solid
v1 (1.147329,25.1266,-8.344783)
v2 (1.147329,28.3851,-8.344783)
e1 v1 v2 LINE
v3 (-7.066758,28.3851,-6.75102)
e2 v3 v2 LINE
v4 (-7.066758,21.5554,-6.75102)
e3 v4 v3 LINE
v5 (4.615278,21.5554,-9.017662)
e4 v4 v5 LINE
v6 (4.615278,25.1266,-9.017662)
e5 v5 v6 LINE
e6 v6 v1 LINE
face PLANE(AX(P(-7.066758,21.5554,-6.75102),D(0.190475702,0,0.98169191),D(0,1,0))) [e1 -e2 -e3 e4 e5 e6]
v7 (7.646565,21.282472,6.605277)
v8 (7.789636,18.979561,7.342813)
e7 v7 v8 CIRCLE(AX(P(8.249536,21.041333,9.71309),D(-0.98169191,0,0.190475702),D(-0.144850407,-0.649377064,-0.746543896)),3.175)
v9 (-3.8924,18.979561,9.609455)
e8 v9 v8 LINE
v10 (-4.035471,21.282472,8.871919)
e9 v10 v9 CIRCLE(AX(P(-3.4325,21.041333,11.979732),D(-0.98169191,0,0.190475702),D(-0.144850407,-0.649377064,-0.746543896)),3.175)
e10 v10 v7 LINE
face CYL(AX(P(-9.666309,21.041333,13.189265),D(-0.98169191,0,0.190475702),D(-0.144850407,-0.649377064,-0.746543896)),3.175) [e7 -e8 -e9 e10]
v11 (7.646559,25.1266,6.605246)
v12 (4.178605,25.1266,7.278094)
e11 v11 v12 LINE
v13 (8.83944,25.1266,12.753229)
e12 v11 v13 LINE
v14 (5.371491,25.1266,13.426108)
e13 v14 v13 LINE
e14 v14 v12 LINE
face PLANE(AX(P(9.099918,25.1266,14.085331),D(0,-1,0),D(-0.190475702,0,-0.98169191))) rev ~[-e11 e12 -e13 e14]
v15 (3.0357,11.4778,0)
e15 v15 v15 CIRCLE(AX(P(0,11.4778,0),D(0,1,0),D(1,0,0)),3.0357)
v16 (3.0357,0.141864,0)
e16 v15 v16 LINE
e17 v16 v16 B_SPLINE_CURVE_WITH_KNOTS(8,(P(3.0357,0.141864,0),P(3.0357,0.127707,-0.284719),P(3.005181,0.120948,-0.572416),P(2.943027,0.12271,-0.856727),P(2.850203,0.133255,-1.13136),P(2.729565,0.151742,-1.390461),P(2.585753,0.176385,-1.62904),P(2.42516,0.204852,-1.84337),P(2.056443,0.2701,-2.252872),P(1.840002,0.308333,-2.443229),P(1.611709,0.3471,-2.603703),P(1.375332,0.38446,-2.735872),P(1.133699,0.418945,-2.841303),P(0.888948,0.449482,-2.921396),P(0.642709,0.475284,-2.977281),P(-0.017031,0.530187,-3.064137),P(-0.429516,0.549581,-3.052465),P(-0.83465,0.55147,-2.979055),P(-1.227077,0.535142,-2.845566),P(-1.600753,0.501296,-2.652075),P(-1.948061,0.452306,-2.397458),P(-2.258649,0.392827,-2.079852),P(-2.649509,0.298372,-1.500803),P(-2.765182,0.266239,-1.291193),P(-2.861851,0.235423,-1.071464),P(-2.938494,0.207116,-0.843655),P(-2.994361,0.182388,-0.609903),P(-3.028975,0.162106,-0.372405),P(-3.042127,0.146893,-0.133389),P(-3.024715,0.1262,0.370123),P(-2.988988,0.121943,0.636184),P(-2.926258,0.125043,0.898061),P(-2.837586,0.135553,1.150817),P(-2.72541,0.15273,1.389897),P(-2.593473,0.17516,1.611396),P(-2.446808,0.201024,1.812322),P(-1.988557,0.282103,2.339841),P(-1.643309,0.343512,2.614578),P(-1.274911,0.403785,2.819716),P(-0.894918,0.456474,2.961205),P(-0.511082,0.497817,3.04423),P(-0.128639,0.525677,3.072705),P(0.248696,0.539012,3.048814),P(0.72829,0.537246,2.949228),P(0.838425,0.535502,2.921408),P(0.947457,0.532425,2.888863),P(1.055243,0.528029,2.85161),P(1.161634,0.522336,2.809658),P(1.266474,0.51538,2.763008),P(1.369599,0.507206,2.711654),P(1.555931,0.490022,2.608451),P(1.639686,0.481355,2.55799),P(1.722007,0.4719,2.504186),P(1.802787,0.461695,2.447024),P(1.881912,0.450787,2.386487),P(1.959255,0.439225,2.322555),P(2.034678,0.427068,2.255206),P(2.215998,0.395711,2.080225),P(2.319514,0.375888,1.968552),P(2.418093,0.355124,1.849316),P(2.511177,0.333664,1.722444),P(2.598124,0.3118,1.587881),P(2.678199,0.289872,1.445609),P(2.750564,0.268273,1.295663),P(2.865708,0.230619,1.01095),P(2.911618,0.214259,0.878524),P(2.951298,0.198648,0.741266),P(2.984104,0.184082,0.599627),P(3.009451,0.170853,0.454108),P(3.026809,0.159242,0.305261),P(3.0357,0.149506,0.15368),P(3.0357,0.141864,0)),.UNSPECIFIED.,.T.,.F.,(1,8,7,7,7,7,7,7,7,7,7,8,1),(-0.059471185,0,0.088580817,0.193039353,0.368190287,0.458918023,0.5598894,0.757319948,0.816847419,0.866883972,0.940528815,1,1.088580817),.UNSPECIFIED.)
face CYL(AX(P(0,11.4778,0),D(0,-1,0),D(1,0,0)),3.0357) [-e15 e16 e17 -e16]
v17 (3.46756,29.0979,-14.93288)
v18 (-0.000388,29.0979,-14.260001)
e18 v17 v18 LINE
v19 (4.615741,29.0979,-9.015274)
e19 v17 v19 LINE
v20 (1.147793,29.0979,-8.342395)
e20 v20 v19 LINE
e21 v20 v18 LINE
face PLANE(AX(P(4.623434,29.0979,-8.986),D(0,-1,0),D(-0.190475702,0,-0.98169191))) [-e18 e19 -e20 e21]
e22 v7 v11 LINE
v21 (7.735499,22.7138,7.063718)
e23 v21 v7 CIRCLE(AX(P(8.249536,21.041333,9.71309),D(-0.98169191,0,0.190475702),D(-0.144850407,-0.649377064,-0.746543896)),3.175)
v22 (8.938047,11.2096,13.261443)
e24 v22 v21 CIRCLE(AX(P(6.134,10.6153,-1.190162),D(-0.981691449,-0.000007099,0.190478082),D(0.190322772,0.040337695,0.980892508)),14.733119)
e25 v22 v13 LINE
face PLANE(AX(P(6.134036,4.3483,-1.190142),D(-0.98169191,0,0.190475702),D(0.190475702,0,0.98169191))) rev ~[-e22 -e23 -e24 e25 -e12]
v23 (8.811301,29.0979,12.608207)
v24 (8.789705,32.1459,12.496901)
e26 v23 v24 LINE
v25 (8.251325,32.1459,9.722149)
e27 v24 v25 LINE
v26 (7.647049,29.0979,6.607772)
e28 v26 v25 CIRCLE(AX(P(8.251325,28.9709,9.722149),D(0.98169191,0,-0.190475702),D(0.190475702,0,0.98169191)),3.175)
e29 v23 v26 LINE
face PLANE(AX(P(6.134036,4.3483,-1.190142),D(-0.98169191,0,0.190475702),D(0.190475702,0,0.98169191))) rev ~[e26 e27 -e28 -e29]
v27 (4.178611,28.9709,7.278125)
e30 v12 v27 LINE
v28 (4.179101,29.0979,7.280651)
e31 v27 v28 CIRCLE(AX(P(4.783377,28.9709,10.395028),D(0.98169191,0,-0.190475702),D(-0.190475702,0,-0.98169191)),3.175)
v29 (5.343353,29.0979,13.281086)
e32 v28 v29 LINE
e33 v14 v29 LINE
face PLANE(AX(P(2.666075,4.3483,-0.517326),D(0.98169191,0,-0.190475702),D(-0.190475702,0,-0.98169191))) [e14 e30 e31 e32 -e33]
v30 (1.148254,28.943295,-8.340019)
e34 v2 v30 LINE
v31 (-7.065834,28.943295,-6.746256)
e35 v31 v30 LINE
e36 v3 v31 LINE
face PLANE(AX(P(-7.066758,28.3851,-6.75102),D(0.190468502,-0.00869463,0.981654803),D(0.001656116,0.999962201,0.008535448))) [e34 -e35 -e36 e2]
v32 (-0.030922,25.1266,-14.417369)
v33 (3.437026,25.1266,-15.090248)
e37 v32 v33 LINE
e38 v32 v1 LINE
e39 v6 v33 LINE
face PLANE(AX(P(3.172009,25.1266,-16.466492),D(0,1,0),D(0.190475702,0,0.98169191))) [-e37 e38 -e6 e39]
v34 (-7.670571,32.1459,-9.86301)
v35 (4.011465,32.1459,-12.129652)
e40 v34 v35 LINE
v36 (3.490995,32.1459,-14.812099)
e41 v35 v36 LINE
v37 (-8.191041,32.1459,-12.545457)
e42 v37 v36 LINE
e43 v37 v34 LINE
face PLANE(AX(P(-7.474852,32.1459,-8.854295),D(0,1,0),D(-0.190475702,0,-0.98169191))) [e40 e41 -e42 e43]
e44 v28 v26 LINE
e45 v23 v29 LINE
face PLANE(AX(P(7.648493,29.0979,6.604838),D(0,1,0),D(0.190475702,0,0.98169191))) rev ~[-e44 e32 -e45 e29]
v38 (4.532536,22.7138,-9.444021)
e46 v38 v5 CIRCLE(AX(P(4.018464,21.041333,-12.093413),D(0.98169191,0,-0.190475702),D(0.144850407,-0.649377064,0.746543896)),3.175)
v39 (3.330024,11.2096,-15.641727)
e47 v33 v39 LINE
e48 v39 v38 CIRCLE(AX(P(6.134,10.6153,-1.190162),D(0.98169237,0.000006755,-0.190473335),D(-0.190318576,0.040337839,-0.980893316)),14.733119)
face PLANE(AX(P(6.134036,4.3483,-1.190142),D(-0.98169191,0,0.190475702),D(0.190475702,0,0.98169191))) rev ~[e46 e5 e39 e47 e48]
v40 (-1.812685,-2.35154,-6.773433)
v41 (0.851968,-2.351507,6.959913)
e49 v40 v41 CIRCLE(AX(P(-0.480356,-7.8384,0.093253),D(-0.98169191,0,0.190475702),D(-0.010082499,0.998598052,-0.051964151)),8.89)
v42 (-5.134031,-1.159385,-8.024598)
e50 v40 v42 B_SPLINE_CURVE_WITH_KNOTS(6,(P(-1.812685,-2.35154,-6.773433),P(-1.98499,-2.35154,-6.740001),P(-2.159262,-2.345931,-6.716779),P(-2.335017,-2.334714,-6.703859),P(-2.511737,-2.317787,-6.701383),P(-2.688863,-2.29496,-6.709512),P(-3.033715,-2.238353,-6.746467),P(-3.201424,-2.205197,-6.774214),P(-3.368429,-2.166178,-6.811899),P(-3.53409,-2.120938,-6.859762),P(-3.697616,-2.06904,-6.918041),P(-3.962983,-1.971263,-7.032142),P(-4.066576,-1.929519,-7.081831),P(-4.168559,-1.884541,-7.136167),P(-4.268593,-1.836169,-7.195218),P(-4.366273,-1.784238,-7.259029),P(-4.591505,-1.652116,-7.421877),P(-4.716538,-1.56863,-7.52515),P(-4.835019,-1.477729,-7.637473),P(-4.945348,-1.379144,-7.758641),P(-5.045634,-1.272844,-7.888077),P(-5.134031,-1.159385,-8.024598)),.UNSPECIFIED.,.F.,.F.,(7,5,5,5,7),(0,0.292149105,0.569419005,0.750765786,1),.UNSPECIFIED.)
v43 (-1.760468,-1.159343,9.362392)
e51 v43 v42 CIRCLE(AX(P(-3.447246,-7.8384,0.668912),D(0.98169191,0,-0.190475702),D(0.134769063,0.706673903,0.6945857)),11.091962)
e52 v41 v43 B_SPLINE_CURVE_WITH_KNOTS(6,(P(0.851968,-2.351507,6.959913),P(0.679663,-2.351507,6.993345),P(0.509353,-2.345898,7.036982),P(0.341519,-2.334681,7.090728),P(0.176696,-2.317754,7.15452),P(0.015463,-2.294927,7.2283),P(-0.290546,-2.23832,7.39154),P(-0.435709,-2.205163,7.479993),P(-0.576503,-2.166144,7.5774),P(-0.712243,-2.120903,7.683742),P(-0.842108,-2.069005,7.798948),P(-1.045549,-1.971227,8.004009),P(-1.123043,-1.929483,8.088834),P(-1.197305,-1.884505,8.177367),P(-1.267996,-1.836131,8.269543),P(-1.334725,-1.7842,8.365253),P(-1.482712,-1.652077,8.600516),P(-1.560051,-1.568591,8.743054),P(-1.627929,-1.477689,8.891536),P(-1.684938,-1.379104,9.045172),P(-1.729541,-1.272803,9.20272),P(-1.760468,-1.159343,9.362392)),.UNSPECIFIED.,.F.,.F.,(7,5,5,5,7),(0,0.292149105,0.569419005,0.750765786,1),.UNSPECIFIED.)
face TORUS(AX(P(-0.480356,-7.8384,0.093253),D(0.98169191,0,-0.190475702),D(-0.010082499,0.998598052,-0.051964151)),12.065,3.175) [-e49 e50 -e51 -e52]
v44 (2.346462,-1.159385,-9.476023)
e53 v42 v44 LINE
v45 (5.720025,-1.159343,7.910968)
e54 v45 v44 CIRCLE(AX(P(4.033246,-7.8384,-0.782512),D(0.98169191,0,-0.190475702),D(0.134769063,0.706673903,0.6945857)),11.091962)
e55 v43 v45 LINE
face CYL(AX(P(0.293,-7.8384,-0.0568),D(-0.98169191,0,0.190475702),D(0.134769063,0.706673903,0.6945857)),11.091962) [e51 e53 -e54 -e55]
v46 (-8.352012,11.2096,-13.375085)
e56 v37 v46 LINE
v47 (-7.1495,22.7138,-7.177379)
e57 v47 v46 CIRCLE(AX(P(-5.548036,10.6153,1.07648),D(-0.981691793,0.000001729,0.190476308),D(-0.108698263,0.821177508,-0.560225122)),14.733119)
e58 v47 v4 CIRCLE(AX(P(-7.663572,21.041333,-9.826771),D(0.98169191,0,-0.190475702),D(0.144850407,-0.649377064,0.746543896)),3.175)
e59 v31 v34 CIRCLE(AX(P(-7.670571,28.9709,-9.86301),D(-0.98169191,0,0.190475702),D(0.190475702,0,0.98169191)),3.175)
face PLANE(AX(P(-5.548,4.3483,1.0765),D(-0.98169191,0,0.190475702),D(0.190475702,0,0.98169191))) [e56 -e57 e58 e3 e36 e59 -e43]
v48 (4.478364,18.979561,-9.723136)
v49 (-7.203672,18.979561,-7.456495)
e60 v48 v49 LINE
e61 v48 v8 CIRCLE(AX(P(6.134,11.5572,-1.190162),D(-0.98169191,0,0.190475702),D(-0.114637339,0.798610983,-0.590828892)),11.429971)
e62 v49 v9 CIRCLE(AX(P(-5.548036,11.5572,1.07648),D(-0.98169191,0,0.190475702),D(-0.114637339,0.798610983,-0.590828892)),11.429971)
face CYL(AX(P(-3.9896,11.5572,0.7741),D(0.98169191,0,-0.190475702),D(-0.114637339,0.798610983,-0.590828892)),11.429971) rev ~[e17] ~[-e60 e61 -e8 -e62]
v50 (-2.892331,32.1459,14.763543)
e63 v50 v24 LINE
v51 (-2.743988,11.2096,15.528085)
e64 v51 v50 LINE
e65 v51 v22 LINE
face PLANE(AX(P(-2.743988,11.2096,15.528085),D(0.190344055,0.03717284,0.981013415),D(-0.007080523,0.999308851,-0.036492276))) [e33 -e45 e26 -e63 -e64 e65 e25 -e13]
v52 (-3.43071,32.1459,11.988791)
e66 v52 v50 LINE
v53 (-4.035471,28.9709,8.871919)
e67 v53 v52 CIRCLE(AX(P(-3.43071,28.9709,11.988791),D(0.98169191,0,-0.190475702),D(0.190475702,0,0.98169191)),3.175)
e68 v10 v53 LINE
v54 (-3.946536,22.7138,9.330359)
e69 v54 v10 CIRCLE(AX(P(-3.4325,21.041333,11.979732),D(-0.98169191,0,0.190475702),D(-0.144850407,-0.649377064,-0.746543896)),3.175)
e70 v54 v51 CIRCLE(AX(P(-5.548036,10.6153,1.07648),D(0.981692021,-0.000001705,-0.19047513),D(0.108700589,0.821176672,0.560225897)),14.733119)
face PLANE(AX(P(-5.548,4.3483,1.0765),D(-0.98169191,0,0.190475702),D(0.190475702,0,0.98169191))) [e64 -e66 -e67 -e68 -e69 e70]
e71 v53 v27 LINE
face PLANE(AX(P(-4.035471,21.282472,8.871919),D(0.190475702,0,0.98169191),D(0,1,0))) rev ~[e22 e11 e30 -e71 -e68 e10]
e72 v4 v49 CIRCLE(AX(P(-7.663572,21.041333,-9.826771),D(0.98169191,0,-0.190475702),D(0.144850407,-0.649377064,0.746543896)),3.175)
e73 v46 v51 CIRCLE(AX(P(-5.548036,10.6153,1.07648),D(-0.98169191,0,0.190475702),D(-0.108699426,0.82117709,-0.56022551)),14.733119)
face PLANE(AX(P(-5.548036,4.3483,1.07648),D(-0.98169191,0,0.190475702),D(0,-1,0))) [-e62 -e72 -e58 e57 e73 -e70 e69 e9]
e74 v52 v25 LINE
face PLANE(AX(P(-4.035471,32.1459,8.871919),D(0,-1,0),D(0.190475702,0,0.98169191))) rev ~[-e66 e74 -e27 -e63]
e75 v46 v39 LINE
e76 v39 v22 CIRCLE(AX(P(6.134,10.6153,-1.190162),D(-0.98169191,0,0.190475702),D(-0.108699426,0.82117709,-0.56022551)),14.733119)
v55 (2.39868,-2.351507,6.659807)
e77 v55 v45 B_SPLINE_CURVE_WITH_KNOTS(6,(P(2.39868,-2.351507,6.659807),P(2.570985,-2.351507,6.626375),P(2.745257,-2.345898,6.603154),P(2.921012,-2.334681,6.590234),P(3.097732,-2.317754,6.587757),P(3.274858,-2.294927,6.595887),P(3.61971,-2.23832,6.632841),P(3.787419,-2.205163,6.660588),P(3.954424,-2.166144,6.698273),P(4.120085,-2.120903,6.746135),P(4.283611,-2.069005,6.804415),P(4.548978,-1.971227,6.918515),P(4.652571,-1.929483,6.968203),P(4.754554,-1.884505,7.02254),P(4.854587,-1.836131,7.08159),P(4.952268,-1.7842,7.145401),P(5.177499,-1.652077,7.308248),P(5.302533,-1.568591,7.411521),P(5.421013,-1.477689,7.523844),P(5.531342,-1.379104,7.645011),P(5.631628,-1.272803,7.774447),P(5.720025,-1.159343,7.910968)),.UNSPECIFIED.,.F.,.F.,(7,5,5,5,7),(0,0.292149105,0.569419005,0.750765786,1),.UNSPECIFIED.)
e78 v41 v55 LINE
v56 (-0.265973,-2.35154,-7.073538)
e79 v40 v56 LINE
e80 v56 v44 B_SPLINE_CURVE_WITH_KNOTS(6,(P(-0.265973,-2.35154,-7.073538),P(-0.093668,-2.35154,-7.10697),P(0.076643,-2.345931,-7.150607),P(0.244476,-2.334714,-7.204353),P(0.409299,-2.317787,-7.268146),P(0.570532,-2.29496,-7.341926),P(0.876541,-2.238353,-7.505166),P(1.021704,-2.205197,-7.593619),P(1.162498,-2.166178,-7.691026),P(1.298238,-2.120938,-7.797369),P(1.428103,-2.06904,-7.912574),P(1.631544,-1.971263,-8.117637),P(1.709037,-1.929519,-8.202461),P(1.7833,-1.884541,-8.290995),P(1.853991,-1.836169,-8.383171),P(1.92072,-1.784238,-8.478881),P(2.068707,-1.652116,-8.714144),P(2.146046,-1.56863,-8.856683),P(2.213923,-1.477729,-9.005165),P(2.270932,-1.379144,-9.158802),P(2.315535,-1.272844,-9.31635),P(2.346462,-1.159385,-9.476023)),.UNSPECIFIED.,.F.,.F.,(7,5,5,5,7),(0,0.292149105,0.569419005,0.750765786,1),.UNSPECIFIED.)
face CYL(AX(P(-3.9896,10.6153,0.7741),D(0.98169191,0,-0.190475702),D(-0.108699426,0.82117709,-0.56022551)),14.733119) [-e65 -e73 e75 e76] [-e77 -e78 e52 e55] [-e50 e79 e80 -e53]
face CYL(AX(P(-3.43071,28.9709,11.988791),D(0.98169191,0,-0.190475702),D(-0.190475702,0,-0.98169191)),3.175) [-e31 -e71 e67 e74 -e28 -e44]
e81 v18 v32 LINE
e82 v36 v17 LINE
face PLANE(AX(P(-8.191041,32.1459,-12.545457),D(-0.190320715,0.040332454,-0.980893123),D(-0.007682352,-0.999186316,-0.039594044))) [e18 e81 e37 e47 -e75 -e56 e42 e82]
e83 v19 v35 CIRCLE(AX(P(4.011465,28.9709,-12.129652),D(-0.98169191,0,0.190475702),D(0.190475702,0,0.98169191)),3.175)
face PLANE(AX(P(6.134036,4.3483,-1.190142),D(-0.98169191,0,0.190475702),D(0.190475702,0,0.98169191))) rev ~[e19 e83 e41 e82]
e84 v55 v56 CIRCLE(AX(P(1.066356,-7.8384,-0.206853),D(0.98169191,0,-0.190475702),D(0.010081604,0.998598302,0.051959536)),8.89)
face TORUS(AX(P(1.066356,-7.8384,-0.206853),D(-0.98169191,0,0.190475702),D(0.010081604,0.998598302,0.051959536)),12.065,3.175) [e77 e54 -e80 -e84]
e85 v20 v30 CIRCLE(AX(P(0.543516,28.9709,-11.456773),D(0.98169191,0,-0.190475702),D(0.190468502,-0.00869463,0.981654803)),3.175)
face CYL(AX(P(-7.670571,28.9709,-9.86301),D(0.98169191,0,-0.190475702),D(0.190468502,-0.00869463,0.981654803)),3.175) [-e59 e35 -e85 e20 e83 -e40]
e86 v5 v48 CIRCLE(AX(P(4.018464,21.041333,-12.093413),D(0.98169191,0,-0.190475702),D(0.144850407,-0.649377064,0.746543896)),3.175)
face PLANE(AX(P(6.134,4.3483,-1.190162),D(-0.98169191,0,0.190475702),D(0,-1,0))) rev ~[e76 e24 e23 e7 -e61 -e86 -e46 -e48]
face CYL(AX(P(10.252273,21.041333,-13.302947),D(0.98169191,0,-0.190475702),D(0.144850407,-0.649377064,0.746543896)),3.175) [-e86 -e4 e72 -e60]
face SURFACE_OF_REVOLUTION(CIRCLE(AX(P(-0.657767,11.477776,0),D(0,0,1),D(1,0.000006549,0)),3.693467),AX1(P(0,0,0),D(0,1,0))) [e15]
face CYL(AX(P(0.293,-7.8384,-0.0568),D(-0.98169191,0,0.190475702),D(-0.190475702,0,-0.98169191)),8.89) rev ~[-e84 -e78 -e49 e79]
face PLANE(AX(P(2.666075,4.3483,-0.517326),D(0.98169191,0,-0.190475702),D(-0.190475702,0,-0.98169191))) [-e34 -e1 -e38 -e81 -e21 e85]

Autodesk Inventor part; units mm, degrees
ref_plane "YZ Plane" through (0, 0, 0) normal (1, 0, 0) x (0, 1, 0)
sketch "Sketch1" plane through (0, 0, 0) normal (0, 0, 1) x (1, 0, 0)
  line L0 (0, 0) -> (0, 15.1122)
  line L1 (3.0357, 11.4778) -> (3.0357, 0)
  line L2 (3.0357, 0) -> (0, 0)
  arc A0 (3.0357, 11.4778) -> (0, 15.1122) centre (-0.6577, 11.4778) ccw
ref_plane "Work Plane3" through (0, 17.8837, 0) normal (0, 1, 0) x (1, 0, 0)
ref_plane "Work Plane1" through (-3.9896, 4.3483, 0.7741) normal (-0.9816919, 0, 0.1904757) x (0, -1, 0)
sketch "Sketch3" plane through (-3.9896, 4.3483, 0.7741) normal (-0.9816919, 0, 0.1904757) x (0, -1, 0)
  arc A0 (-16.337, -6.8791) -> (-16.337, 6.8791) centre (-7.2089, 0) ccw
  line L0 (-13.5354, -0.5887) -> (0.7521, -0.5887) projected
  line L1 (-13.5354, 0.6171) -> (0.7521, 0.6171) projected
  line L2 (-7.2089, 0) -> (-7.9901, -0.5887)
  line L3 (-16.337, -6.8791) -> (-18.3655, -8.4078)
  line L4 (-7.2089, 0) -> (-8.0277, 0.6171)
  line L5 (-16.337, 6.8791) -> (-18.3655, 8.4078)
  arc A1 (-18.3655, -8.4078) -> (-18.3655, 8.4078) centre (-6.267, 0) ccw
extrude "Extrusion2" add sketch "Sketch3" along normal blind 1.5875 and the other way blind 10.3124
fillet "Fillet1" radius 3.175 2 edges at (-1.0173, 20.6854, -6.81) (1.6033, 20.6854, 6.6963)
ref_plane "Work Plane2" through (0.293, 4.3483, -0.0568) normal (0.9816919, 0, -0.1904757) x (-0.1904757, 0, -0.9816919)
sketch "Sketch4" plane through (0.293, 4.3483, -0.0568) normal (0.9816919, 0, -0.1904757) x (-0.1904757, 0, -0.9816919)
  circle A0 centre (0, -12.1867) radius 8.89
  arc A1 (-8.4078, 18.3655) -> (8.4078, 18.3655) centre (0, 7.2089) ccw projected
  arc A2 (-7.848, -4.3483) -> (7.848, -4.3483) centre (0, -12.1867) ccw
  point P0 (0, -4.3483)
  point P1 (5.8384, -5.4826)
  point P2 (-5.8384, -5.4826)
  dimension "d17" = 17.78
extrude "Extrusion3" add sketch "Sketch4" along normal mid plane 7.62 contours A0 A1 A2
fillet "Fillet2" radius 3.175 2 edges at (-3.4473, -16.7283, 0.6689) (4.0332, -16.7283, -0.7826)
sketch "Sketch5" plane through (-5.548, 4.3483, 1.0765) normal (-0.9816919, 0, 0.1904757) x (0.1904757, 0, 0.9816919)
  arc A0 (-8.6921, 14.6313) -> (-8.4078, 18.3655) centre (-11.1066, 16.6931) ccw
  line L0 (-7.9735, 17.2071) -> (-7.9735, 24.0368)
  line L1 (-10.116, 16.8437) -> (-10.116, 16.3667)
  arc A1 (8.4078, 18.3655) -> (8.6921, 14.6313) centre (11.1066, 16.6931) ccw
  line L2 (7.9735, 17.2071) -> (7.9735, 24.0368)
  line L3 (10.0556, 16.9067) -> (10.0556, 16.0648)
  line L4 (-8.0331, 17.1837) -> (-7.9735, 17.2071)
  line L5 (-7.9735, 24.0368) -> (-7.9408, 27.7976)
  line L6 (-10.116, 27.7976) -> (-7.9408, 27.7976)
  line L7 (7.9408, 27.7976) -> (10.0556, 27.7976)
  arc A2 (-8.4078, 18.3655) -> (8.4078, 18.3655) centre (0, 7.2089) ccw
  line L8 (7.9408, 27.7976) -> (13.9423, 27.7976)
  line L9 (13.9423, 27.7976) -> (13.9423, 6.3292)
  line L10 (13.9423, 6.3292) -> (13.9416, 6.3292)
  line L11 (7.9408, 16.452) -> (7.9408, 27.7976)
  line L12 (-7.9408, 27.7976) -> (-13.876, 27.7976)
  line L13 (-13.876, 27.7976) -> (-13.876, 6.3292)
  line L14 (-7.9408, 16.452) -> (-7.9408, 27.7976)
  arc A3 (13.9421, 6.3267) -> (7.9408, 16.452) centre (-4.3172, 2.3454) ccw
  arc A4 (-7.9408, 16.452) -> (-13.876, 6.3292) centre (3.6251, 2.8693) ccw
  line L15 (-8.1275, 6.3292) -> (-7.9408, 6.3292)
  line L16 (-13.876, 6.3292) -> (-13.876, -0.5906) construction
  line L17 (-13.876, -0.5906) -> (-10.116, -4.3483) construction
  arc A5 (-6.9947, -6.6998) -> (6.9947, -6.6998) centre (0, -12.1867) ccw
  line L18 (-10.116, -4.3483) -> (-7.0424, -6.7611) construction
  line L19 (-7.0424, -6.7611) -> (0, -8.3144) construction
  line L20 (0, -8.3144) -> (5.2825, -7.1493) construction
  line L21 (13.9421, 5.8129) -> (13.9421, 6.3267) construction
  arc A6 (10.0377, -3.7332) -> (10.431, -3.4046) centre (1.9746, 6.3181) ccw
  spline S0 degree 4 poles (-13.876, 6.3292) (-13.876, -0.5906) (-10.116, -4.3483) (-7.0424, -6.7611) (0, -8.3144) (5.2825, -7.1493) (8.5532, -4.7704) (10.0372, -3.7336) (10.0377, -3.7332) knots 1 1 1 1 1 2 3 4 5 5.000386 5.000386 5.000386 5.000386 5.000386
  spline S1 degree 4 poles (13.9158, 4.457) (13.9287, 4.8802) (13.9376, 5.3315) (13.9421, 5.8129) (13.9421, 6.3267) knots 0 0 0 0 0 1 1 1 1 1
  line L22 (5.2825, -7.1493) -> (8.5532, -4.7704) construction
  line L23 (8.5532, -4.7704) -> (10.0372, -3.7336) construction
  line L24 (10.0372, -3.7336) -> (10.0377, -3.7332) construction
  arc A7 (10.431, -3.4046) -> (13.9421, 6.3267) centre (0.7781, 5.5773) ccw
  line L25 (13.9158, 4.457) -> (13.9287, 4.8802) construction
  line L26 (13.9287, 4.8802) -> (13.9376, 5.3315) construction
  line L27 (13.9376, 5.3315) -> (13.9421, 5.8129) construction
  point P0 (0, -4.3483)
  point P1 (10.0556, 24.2784)
  point P2 (7.9735, 31.5584)
  point P3 (-7.9735, 31.5584)
  point P4 (-10.116, 31.5584)
  point P5 (-10.116, 27.7976)
  point P6 (-13.876, 8.8266)
  point P7 (7.9408, 16.9341)
  point P8 (13.9423, 8.0887)
  point P9 (10.0556, 27.7976)
  point P10 (5.8384, -5.4826)
  point P11 (-5.8384, -5.4826)
sketch "Sketch6" plane through (-5.548, 4.3483, 1.0765) normal (-0.9816919, 0, 0.1904757) x (0.1904757, 0, 0.9816919)
  point P0 (0, -4.3483)
revolve "Revolution3" add sketch "Sketch1" angle 360 about axis through (0, 0, 0) along (0, 1, 0)
extrude "Extrusion7" add sketch "Sketch5" against normal up to surface (11.8999 mm away) contours A0 A2 L13 L12 L6 L5 L0 | A2 A1 L11 L7 L8 L9
fillet "Fillet4" radius 3.175 2 edges at (-1.2195, 32.1459, -7.8522) (1.8055, 32.1459, 7.7386)
sketch "Sketch9" plane through (-5.548, 4.3483, 1.0765) normal (-0.9816919, 0, 0.1904757) x (0.1904757, 0, 0.9816919)
  line L0 (-13.876, 11.2188) -> (-13.876, 27.7976) projected
  line L1 (-13.876, 27.7976) -> (-14.7211, 6.8613)
  arc A0 (-13.876, 11.2188) -> (13.9423, 11.0291) centre (0, 6.267) ccw projected
  line L2 (14.7211, 6.8613) -> (13.9423, 27.7976)
  line L3 (-13.876, 27.7976) -> (-11.1435, 27.7976) projected
  line L4 (-13.876, 27.7976) -> (-12.5098, 7.6225)
  line L5 (-12.5098, 7.6225) -> (-14.7211, 6.8613)
  line L6 (14.7211, 6.8613) -> (11.1518, 18.0483)
  line L7 (13.9423, 27.7976) -> (13.9423, 11.0291) projected
  line L8 (11.1518, 18.0483) -> (13.9423, 27.7976)
  point P0 (0, -4.3483)
extrude "Extrusion10" add sketch "Sketch9" against normal up to surface (11.8999 mm away) contours A0 L1 L0 | A0 L7 L2
sketch "Sketch10" plane through (6.134, 4.3483, -1.1902) normal (0.9816919, 0, -0.1904757) x (-0.1904757, 0, -0.9816919)
  line L0 (-7.9408, 16.9341) -> (-7.9408, 24.6226) projected
  line L1 (-7.9408, 24.7496) -> (-15.5608, 24.7496)
  line L2 (-15.5608, 24.7496) -> (-15.5608, 20.7783)
  line L3 (-15.5608, 20.7783) -> (-7.9408, 20.7783)
  line L4 (-7.9408, 20.7783) -> (-7.9408, 24.7496)
  line L5 (-11.1158, 27.7976) -> (-13.9423, 27.7976) projected
  line L6 (7.9408, 24.7496) -> (15.5608, 24.7496)
  line L7 (15.5608, 24.7496) -> (15.5608, 20.7783)
  line L8 (15.5608, 20.7783) -> (7.9408, 20.7783)
  line L9 (7.9408, 20.7783) -> (7.9408, 24.7496)
  point P0 (0, -4.3483)
  point P1 (7.9408, 24.6226)
  point P2 (-7.9408, 20.7783)
  point P3 (-7.9408, 24.6226)
  dimension "d48" = 3.048
  dimension "d49" = 7.62
  dimension "d50" = 3.9712
extrude "Extrusion12" cut sketch "Sketch10" against normal blind 3.5306
properties part number "Clip10"
